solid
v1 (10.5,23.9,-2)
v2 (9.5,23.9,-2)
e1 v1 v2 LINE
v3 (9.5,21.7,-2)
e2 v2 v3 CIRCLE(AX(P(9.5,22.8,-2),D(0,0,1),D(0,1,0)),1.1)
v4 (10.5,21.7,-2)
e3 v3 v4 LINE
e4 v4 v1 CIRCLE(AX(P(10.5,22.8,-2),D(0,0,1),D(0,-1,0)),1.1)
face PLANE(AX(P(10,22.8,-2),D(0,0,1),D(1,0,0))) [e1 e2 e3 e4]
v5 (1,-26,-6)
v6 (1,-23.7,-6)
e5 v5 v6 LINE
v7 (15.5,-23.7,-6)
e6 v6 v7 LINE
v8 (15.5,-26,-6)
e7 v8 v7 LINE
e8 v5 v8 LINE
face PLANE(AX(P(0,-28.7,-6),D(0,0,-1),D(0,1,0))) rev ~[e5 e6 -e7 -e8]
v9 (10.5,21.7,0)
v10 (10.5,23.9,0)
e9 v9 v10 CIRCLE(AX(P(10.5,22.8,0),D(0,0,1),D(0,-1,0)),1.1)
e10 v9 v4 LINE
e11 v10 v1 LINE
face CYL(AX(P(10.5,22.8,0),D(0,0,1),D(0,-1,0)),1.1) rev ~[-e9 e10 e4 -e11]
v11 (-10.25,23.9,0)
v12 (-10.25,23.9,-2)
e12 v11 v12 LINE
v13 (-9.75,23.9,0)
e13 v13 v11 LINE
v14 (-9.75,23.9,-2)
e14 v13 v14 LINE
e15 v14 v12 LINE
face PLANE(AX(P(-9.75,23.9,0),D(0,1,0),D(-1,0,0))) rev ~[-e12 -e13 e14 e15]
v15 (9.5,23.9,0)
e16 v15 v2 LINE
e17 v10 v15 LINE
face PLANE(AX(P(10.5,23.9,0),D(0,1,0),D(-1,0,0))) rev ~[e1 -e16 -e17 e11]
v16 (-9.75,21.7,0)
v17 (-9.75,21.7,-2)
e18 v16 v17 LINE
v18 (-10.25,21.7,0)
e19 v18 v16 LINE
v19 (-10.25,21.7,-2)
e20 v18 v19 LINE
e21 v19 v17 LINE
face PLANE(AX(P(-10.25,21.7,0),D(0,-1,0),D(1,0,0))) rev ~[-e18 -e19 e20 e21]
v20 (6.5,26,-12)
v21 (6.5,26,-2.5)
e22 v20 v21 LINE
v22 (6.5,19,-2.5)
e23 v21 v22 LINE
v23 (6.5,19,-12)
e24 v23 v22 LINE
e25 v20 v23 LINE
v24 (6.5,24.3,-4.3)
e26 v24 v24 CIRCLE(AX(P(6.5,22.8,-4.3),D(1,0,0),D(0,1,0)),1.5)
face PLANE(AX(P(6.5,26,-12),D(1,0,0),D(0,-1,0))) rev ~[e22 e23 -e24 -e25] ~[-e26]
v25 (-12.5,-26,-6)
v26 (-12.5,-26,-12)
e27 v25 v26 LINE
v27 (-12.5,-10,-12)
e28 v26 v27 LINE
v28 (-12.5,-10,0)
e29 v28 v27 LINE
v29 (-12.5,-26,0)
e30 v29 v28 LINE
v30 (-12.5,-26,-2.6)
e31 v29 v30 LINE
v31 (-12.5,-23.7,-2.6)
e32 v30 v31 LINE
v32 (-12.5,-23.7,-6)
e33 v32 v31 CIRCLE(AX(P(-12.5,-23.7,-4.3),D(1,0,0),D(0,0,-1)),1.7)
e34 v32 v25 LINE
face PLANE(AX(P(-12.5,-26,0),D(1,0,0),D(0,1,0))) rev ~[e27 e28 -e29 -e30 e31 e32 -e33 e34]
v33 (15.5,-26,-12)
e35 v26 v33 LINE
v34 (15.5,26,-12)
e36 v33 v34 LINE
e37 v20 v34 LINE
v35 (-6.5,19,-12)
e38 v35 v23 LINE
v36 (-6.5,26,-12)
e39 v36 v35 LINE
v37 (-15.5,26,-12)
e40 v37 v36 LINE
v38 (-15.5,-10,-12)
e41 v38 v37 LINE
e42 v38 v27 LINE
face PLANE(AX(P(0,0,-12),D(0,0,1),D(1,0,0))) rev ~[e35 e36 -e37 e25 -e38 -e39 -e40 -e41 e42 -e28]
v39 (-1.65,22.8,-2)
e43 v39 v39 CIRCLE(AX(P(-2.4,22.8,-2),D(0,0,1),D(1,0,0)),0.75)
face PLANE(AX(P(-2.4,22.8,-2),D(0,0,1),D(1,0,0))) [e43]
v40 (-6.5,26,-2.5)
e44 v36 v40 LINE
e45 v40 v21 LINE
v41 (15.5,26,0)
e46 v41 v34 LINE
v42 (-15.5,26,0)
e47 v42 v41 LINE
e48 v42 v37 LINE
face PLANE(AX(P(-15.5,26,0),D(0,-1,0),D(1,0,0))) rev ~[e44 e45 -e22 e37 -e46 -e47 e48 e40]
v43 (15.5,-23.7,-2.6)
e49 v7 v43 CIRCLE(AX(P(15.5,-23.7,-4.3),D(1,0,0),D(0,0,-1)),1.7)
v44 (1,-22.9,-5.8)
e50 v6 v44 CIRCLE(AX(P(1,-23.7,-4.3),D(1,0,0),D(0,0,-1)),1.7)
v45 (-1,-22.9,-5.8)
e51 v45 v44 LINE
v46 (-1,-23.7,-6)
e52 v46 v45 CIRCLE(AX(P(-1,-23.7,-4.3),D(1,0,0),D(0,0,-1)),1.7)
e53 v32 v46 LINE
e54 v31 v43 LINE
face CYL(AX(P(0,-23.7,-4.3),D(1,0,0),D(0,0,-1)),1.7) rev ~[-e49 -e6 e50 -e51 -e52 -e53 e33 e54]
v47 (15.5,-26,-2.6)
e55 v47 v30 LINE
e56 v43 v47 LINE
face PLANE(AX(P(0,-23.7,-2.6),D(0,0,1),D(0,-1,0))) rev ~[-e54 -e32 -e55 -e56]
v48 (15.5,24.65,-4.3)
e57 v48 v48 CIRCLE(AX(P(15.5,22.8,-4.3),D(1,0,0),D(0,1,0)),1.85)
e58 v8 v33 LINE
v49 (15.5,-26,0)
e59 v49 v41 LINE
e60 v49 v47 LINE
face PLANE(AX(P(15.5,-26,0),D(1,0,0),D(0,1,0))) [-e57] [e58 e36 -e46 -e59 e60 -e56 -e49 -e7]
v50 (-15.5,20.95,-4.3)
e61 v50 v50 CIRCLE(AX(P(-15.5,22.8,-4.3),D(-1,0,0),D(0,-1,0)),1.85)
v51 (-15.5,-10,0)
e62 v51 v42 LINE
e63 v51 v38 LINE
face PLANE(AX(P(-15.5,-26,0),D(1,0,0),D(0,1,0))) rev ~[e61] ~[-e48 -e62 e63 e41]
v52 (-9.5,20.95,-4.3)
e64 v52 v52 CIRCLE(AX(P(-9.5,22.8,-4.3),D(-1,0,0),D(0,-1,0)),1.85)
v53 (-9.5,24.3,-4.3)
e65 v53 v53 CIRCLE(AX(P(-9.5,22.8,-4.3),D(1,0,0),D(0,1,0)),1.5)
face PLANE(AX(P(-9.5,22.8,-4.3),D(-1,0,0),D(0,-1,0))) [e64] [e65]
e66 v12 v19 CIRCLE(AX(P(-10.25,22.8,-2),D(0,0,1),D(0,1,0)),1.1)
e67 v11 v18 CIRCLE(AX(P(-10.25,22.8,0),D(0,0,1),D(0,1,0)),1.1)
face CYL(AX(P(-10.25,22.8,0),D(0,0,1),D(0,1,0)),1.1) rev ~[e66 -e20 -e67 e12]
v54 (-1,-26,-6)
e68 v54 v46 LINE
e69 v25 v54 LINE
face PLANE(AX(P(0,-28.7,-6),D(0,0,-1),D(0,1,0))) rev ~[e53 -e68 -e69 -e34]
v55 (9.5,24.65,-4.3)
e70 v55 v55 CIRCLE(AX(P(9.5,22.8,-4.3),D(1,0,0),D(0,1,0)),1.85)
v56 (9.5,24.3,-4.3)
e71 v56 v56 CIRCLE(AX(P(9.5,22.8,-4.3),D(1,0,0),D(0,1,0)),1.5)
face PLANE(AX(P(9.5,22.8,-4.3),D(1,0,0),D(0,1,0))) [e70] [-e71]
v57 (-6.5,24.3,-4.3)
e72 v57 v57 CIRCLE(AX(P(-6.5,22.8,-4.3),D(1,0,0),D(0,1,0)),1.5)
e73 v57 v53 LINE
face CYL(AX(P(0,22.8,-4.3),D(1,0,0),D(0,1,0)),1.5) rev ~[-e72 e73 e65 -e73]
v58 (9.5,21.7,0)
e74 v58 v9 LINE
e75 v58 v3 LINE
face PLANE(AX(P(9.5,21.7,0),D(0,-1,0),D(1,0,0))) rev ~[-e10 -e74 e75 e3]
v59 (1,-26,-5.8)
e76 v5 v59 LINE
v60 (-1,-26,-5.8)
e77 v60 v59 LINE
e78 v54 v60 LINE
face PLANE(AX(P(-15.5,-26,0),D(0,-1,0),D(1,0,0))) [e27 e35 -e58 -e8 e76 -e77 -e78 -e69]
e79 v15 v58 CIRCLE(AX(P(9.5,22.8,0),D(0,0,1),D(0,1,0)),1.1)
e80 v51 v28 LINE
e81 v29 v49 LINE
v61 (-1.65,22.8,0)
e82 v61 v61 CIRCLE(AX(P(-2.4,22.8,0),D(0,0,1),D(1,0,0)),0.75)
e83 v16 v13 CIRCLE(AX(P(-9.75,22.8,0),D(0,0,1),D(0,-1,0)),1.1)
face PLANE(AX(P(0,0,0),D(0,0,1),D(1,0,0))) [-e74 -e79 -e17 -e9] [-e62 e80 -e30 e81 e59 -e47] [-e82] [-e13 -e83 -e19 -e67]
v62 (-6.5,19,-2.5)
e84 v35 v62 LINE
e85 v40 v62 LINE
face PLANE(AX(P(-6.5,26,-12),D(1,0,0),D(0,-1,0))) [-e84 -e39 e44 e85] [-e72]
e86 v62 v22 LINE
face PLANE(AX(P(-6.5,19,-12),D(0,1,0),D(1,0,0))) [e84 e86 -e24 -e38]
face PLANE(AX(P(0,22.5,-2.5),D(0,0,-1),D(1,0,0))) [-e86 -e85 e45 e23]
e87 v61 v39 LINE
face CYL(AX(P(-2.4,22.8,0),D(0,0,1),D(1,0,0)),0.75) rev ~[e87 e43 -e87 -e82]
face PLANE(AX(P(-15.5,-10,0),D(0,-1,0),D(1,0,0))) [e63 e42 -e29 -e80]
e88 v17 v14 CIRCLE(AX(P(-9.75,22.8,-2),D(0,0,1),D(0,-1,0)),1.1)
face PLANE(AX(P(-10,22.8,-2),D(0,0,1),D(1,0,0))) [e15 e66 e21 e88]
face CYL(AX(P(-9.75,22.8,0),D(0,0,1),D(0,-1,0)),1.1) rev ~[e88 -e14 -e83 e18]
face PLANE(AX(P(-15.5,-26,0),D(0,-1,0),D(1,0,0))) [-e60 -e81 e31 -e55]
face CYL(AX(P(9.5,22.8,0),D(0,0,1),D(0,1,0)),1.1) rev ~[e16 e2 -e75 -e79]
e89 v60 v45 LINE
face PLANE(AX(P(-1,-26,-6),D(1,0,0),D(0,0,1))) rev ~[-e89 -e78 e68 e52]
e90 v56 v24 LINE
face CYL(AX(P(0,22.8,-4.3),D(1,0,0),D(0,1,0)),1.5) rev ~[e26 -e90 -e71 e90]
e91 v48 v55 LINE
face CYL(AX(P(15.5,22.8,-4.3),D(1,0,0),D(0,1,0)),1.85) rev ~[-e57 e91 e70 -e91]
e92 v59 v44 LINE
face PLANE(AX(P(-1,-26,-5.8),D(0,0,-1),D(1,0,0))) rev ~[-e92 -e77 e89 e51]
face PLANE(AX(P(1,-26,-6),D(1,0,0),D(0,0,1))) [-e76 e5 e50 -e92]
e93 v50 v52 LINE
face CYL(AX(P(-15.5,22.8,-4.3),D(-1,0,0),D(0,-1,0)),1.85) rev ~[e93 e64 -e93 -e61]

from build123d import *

# Parameters (mm, degrees)
F0_W      = 31
F0_H      = 52
F1_DEPTH  = 12
F2_R      = 1.5
F3_DEPTH  = 25
F4_R      = 0.75
F5_DEPTH  = 2
F6_W      = 2
F6_H      = 0.2
F8_W      = 3
F8_H      = 16
F9_DEPTH  = 12.001
F10_W     = 13
F10_H     = 7
F11_DEPTH = 9.5
F12_R     = 1.85
F12_R_2   = 1.5
F13_DEPTH = 6
F14_R     = 1.85
F15_DEPTH = 6


with BuildPart() as f1:
    # F0 (on Top) → F1 (new body)
    with BuildSketch(Plane.XY):
        Rectangle(F0_W, F0_H)
    extrude(amount=-F1_DEPTH)

    # F2 (on Right) → F3 (cut, symmetric)
    with BuildSketch(Plane.YZ):
        with Locations((22.8, -4.3)):
            Circle(F2_R)
        with BuildLine():
            Line((-28.7, -6), (-23.7, -6))
            ThreePointArc((-23.7, -6), (-22, -4.3), (-23.7, -2.6))
            Line((-23.7, -2.6), (-28.7, -2.6))
            Line((-28.7, -2.6), (-28.7, -6))
        make_face()
    extrude(amount=F3_DEPTH, both=True, mode=Mode.SUBTRACT)

    # F4 (on face) → F5 (cut)
    with BuildSketch(Plane.XY):
        with BuildLine():
            Line((9.5, 21.7), (10.5, 21.7))
            ThreePointArc((10.5, 21.7), (11.6, 22.8), (10.5, 23.9))
            Line((10.5, 23.9), (9.5, 23.9))
            ThreePointArc((9.5, 23.9), (8.4, 22.8), (9.5, 21.7))
        make_face()
        with BuildLine():
            Line((-9.75, 23.9), (-10.25, 23.9))
            ThreePointArc((-10.25, 23.9), (-11.35, 22.8), (-10.25, 21.7))
            Line((-10.25, 21.7), (-9.75, 21.7))
            ThreePointArc((-9.75, 21.7), (-8.65, 22.8), (-9.75, 23.9))
        make_face()
        with Locations((-2.4, 22.8)):
            Circle(F4_R)
    extrude(amount=-F5_DEPTH, mode=Mode.SUBTRACT)

    # F6 (on face) → F7 (join, up to the next surface of F1)
    with BuildSketch(Plane.XZ.offset(26)):
        with Locations((0, -5.9)):
            Rectangle(F6_W, F6_H)
    extrude(until=Until.NEXT, dir=(0, 1, 0))

    # F8 (on face) → F9 (cut, through all)
    with BuildSketch(Plane.XY):
        with Locations((-14, -18)):
            Rectangle(F8_W, F8_H)
    extrude(amount=-F9_DEPTH, mode=Mode.SUBTRACT)

    # F10 (on face) → F11 (cut)
    with BuildSketch(Plane(origin=(0, 0, -12), x_dir=(1, 0, 0), z_dir=(0, 0, -1))):
        with Locations((0, -22.5)):
            Rectangle(F10_W, F10_H)
    extrude(amount=-F11_DEPTH, mode=Mode.SUBTRACT)

    # F12 (on face) → F13 (cut)
    with BuildSketch(Plane(origin=(-15.5, 0, 0), x_dir=(0, -1, 0), z_dir=(-1, 0, 0))):
        with Locations((-22.8, -4.3)):
            Circle(F12_R)
        with Locations((-22.8, -4.3)):
            Circle(F12_R_2, mode=Mode.SUBTRACT)
    extrude(amount=-F13_DEPTH, mode=Mode.SUBTRACT)

    # F14 (on face) → F15 (cut)
    with BuildSketch(Plane.YZ.offset(15.5)):
        with Locations((22.8, -4.3)):
            Circle(F14_R)
    extrude(amount=-F15_DEPTH, mode=Mode.SUBTRACT)


solid = f1.part
